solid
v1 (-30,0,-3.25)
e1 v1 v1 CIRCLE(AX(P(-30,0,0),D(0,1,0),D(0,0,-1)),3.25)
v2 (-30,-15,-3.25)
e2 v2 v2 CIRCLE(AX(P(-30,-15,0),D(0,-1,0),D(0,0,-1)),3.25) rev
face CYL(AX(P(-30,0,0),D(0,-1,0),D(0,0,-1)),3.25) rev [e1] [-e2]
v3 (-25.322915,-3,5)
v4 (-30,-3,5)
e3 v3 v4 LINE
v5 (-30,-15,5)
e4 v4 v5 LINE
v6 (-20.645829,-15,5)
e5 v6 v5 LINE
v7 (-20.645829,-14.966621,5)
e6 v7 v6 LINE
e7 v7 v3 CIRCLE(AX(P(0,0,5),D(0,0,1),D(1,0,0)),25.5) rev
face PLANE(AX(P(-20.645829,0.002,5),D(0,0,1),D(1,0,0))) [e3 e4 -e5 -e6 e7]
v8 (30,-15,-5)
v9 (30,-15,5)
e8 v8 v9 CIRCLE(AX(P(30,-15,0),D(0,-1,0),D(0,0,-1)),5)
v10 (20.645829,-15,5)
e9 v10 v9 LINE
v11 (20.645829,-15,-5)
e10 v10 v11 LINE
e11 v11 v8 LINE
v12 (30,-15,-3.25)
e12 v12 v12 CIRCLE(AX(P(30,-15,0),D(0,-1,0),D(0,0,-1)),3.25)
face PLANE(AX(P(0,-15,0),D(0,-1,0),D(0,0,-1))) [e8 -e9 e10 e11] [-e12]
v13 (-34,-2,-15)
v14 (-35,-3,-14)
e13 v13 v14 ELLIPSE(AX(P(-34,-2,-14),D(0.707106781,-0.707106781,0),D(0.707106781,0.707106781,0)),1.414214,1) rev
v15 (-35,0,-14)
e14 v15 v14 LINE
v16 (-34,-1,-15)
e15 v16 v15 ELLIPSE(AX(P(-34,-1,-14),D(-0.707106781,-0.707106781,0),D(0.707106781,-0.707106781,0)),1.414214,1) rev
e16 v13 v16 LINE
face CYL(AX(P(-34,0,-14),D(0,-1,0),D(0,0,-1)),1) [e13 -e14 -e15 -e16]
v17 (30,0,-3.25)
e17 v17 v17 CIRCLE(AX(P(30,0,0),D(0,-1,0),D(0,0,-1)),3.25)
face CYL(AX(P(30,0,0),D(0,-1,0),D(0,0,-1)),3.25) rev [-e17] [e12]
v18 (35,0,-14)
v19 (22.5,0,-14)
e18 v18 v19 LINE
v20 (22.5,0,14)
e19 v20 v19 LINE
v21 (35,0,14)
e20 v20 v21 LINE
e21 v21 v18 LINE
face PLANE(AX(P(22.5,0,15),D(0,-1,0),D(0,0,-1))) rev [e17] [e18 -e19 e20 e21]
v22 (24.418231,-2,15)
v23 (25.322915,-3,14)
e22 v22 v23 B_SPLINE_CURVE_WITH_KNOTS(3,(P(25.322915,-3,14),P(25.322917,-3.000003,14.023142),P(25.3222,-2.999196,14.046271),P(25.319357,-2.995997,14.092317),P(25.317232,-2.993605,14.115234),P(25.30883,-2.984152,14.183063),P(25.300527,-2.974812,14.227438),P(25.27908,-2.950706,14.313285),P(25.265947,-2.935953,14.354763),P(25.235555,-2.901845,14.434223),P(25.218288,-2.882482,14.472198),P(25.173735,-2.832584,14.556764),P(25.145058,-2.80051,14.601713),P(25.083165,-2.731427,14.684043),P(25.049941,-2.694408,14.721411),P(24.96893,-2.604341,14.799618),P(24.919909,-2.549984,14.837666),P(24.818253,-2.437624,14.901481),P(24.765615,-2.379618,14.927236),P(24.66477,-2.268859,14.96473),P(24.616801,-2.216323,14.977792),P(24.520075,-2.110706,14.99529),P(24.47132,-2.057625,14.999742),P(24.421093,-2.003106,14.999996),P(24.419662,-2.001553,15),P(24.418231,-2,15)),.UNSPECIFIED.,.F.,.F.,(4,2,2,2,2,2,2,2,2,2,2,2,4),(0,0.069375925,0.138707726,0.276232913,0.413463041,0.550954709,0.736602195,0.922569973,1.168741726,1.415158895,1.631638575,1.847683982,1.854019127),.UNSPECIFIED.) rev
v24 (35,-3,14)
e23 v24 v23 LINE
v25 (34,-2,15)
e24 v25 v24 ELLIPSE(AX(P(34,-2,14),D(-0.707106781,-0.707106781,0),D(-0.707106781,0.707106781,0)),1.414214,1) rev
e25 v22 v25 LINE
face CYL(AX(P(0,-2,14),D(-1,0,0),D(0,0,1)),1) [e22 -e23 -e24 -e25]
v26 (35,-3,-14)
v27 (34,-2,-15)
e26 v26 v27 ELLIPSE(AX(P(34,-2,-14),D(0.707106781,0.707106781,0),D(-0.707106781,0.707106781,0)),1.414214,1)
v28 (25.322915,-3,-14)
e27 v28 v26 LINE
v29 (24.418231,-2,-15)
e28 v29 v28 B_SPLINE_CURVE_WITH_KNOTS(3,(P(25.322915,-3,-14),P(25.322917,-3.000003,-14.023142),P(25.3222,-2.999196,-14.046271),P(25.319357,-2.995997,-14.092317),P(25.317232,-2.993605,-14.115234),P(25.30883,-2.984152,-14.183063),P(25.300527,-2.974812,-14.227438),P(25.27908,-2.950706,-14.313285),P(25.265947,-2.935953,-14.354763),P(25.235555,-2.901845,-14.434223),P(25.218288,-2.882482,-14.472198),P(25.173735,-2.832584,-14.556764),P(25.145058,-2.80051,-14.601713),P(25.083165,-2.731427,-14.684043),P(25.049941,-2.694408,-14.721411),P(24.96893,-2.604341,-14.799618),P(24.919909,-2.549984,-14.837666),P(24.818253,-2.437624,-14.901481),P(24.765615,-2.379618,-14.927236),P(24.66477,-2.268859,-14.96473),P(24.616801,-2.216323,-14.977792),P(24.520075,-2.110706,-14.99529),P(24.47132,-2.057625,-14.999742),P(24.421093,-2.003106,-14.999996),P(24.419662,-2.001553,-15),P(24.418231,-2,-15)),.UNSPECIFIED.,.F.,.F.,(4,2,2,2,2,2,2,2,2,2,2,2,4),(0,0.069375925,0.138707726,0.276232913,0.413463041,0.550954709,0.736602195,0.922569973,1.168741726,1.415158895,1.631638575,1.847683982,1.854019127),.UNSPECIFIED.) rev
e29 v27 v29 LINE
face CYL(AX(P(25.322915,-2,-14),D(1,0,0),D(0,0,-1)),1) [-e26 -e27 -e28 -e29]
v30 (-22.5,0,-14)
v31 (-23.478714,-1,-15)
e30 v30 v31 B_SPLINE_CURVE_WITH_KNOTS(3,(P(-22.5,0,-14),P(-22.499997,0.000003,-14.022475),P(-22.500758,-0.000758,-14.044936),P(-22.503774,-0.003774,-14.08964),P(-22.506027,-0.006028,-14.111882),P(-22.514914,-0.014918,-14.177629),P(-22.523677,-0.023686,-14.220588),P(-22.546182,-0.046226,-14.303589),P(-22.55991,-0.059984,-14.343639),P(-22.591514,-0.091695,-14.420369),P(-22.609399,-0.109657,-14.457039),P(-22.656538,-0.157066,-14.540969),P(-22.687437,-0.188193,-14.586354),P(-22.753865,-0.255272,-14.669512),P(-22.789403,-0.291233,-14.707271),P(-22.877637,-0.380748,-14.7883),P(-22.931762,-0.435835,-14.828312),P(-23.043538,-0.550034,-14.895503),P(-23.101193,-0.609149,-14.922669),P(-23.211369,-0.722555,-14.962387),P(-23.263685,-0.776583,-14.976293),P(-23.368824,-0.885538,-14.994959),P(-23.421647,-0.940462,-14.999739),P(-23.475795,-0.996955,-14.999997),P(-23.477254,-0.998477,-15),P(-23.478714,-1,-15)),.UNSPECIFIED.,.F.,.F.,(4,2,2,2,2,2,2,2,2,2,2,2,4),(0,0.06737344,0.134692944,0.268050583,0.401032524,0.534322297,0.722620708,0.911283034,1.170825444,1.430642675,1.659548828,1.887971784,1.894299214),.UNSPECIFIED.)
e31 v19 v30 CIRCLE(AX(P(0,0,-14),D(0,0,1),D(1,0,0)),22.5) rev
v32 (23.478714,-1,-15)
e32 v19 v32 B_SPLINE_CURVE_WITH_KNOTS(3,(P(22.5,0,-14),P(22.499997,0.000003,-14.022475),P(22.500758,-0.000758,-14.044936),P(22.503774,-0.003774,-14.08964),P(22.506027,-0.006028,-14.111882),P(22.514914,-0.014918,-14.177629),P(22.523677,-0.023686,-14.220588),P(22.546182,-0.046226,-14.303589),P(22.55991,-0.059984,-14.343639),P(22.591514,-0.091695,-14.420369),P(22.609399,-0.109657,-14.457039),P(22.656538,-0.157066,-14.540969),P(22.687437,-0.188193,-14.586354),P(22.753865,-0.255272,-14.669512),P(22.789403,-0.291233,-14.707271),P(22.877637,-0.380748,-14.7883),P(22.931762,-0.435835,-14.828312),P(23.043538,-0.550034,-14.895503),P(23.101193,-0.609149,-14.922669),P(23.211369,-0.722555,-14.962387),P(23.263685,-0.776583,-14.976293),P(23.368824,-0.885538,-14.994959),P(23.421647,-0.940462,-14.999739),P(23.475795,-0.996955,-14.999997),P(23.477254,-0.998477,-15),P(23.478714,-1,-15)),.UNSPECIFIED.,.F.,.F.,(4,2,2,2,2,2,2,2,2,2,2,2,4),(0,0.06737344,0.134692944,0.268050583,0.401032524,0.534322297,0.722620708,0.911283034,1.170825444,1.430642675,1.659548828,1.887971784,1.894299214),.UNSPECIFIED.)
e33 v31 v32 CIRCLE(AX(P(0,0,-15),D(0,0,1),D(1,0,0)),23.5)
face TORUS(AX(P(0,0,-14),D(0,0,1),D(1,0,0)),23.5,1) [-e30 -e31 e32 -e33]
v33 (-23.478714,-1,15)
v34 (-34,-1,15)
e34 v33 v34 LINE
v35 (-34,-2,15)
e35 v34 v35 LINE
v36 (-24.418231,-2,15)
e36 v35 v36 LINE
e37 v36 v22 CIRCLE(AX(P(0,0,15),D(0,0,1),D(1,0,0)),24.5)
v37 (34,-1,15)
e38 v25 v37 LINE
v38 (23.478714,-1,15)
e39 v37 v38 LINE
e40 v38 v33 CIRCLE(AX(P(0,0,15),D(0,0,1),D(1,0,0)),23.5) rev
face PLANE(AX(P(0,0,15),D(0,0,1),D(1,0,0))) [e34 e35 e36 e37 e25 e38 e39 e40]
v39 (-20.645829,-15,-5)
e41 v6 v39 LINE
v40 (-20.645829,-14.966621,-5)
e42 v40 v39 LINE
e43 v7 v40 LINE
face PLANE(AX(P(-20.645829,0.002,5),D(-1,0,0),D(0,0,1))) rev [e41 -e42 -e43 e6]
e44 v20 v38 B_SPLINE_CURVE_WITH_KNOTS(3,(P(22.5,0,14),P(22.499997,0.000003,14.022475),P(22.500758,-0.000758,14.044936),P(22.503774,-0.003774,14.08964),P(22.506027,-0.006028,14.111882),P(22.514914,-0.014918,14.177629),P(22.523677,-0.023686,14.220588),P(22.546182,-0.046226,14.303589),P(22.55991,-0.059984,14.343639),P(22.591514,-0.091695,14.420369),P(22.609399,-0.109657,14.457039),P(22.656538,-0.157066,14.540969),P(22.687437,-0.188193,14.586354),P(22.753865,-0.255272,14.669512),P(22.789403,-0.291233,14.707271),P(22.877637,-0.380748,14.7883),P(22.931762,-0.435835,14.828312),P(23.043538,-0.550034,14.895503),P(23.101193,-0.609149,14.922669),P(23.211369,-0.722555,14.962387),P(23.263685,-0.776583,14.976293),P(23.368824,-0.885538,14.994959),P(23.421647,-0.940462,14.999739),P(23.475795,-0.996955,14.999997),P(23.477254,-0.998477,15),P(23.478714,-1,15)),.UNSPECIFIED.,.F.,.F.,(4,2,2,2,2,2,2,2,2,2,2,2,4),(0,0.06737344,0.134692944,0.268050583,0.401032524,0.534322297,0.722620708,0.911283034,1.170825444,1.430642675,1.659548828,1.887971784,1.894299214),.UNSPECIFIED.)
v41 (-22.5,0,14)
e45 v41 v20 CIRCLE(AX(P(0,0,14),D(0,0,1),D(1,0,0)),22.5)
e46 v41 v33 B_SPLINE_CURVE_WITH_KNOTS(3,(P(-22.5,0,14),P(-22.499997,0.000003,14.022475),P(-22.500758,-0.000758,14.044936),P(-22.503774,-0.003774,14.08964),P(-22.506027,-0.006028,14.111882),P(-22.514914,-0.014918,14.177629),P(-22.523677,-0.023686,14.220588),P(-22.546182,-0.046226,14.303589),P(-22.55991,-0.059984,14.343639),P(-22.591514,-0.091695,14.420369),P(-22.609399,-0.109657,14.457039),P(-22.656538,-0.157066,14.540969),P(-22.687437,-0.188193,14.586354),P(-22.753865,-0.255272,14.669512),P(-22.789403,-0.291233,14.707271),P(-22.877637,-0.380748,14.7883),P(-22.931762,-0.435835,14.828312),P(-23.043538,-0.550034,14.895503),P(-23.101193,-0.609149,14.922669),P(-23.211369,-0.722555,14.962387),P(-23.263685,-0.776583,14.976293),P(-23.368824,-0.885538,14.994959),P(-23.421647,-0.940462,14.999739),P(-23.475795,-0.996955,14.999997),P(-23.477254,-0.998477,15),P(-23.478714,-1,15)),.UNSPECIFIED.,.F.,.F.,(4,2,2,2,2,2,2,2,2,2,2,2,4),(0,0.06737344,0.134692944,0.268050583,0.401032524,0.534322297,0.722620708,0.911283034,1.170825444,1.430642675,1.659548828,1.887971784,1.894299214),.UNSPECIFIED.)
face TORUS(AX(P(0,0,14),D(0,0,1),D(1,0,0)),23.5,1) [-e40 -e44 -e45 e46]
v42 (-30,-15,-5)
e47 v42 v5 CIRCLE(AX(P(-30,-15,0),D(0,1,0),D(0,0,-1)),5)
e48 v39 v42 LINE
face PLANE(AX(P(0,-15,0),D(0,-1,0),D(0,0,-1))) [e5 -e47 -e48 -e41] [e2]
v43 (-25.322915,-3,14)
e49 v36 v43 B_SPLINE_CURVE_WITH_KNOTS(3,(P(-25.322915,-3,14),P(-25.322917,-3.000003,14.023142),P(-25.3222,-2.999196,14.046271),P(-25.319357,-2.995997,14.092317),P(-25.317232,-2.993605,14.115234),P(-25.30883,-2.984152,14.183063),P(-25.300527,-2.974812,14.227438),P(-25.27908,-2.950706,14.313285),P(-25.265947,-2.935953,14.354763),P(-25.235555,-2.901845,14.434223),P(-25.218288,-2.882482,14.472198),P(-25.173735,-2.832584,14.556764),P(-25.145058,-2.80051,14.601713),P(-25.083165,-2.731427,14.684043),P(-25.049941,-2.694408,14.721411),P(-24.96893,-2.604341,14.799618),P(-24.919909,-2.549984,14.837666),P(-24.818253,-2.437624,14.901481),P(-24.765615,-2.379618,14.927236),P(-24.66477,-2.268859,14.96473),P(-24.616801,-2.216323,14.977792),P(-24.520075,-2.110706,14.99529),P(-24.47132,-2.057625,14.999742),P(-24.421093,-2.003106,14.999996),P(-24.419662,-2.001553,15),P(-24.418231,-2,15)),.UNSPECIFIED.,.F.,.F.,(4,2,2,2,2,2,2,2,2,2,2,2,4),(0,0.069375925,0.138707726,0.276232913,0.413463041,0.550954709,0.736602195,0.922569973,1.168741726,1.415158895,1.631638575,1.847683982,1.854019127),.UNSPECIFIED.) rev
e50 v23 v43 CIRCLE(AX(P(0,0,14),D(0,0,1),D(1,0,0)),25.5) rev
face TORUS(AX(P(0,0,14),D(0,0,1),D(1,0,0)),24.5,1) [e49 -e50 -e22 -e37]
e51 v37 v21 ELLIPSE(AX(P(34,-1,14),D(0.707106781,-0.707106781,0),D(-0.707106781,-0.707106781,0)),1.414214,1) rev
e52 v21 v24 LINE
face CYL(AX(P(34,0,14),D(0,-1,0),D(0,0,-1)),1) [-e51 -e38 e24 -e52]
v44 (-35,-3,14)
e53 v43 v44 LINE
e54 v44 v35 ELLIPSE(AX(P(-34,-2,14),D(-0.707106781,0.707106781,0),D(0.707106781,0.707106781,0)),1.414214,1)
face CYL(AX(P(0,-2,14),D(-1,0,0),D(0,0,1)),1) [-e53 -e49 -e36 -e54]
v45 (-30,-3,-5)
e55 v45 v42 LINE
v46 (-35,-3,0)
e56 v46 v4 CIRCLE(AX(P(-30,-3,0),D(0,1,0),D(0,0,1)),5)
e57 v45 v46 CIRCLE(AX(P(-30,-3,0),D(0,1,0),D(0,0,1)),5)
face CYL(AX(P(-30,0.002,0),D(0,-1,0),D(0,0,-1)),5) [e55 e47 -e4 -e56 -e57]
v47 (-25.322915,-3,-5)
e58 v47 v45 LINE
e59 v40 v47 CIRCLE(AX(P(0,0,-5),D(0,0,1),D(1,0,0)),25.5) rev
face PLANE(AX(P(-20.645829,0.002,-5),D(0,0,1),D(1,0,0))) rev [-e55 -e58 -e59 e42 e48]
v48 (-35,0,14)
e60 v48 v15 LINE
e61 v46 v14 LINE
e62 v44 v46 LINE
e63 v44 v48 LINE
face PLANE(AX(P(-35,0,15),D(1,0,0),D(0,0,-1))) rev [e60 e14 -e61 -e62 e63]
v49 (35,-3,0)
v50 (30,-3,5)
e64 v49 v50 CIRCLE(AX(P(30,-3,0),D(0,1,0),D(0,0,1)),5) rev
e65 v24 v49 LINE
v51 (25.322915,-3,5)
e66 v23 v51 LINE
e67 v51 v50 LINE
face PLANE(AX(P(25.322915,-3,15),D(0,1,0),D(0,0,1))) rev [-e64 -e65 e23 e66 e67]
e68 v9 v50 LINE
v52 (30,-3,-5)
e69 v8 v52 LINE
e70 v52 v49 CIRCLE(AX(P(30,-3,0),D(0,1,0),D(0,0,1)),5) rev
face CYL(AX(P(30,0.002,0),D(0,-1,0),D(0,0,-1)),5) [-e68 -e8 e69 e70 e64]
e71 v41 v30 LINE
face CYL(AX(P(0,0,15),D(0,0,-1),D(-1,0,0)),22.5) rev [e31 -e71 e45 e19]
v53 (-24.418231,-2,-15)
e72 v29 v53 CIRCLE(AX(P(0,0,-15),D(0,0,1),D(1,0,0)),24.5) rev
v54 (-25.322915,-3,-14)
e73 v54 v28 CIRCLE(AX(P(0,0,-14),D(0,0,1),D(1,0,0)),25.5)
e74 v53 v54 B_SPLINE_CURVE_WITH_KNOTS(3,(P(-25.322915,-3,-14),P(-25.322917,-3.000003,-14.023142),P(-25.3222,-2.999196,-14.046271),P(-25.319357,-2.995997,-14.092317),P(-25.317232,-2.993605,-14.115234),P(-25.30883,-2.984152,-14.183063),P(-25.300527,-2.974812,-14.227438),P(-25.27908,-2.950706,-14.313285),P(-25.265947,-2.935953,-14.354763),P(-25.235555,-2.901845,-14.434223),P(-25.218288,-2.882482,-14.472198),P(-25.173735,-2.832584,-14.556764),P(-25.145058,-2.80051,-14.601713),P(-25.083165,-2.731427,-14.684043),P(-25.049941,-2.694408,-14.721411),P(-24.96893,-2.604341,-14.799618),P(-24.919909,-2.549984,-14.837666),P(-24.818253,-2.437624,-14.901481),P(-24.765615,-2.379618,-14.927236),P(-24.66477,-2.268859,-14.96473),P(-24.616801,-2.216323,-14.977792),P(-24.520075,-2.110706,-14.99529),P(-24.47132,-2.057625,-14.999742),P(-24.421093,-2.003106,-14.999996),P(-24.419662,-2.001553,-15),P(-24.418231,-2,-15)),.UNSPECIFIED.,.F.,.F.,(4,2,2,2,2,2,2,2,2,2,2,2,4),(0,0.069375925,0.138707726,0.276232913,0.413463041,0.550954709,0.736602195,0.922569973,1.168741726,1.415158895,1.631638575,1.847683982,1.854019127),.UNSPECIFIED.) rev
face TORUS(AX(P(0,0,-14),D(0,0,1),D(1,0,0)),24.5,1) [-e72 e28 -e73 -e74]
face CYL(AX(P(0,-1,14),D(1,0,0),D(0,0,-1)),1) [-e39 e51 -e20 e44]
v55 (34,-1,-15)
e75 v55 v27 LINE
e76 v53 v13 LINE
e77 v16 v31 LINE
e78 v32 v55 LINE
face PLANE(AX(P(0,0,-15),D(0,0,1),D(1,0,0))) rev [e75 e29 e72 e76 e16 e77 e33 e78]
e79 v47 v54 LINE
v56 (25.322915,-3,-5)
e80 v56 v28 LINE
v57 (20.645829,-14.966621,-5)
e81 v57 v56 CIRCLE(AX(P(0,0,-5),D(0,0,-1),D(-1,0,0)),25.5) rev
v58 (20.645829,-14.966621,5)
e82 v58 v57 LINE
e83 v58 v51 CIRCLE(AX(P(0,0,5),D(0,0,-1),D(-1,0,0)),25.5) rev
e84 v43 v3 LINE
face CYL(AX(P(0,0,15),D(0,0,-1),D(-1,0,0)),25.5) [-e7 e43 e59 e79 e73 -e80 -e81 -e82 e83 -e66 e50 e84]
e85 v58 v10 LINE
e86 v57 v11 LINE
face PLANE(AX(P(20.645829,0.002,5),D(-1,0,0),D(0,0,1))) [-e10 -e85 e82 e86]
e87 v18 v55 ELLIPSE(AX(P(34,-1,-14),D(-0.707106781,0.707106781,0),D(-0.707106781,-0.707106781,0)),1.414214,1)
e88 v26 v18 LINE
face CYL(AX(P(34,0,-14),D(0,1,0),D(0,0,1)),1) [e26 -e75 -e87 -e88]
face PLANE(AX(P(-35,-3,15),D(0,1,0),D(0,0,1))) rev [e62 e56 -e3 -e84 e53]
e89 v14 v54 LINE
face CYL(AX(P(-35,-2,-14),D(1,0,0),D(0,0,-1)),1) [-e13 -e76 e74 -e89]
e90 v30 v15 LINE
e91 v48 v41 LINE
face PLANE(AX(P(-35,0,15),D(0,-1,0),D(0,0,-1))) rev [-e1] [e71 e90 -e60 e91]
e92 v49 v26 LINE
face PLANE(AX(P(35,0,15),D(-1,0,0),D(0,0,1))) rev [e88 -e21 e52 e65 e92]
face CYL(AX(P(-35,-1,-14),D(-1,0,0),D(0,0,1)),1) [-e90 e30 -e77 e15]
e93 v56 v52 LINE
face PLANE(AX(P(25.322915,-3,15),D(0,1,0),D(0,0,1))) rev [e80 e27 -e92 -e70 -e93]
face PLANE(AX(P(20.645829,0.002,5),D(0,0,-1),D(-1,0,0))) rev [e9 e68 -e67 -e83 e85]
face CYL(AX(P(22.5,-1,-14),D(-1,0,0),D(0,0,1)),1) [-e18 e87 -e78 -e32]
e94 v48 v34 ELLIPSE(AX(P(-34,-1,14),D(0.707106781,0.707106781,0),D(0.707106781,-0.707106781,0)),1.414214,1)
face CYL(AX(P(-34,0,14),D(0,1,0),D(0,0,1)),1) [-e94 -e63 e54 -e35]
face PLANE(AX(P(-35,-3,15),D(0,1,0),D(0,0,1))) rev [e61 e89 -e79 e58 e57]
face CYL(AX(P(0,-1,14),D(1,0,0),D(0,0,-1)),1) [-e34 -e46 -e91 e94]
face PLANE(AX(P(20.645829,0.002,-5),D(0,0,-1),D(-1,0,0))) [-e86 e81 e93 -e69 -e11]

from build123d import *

# Parameters (mm, degrees)
BOSS_EXTRUDE1_DEPTH = 15
BOSS_EXTRUDE5_REACH = 58.23
BOSS_EXTRUDE5_START = 12
SKETCH4_5_R         = 3.25
CUT_EXTRUDE1_DEPTH  = 45.229515032
FILLET1_R           = 1


with BuildPart() as part:
    # Sketch1 → Boss-Extrude1 (new, symmetric)
    with BuildSketch(Plane.XY):
        with BuildLine():
            Line((-35, 0), (-22.5, 0))
            ThreePointArc((-22.5, 0), (0, -22.5), (22.5, 0))
            Line((22.5, 0), (35, 0))
            Line((35, 0), (35, -3))
            Line((35, -3), (25.322914524, -3))
            ThreePointArc((25.322914524, -3), (0, -25.5), (-25.322914524, -3))
            Line((-25.322914524, -3), (-35, -3))
            Line((-35, -3), (-35, 0))
        make_face()
    extrude(amount=BOSS_EXTRUDE1_DEPTH, both=True)

    # Sketch4 → Boss-Extrude5 (add, up to next)
    with BuildSketch(Plane.XZ.offset(3).offset(BOSS_EXTRUDE5_START), mode=Mode.PRIVATE) as boss_extrude5_sk1:
        with BuildLine():
            Line((20.645829048, 5), (20.645829048, -5))
            Line((20.645829048, -5), (30, -5))
            ThreePointArc((30, -5), (35, 0), (30, 5))
            Line((30, 5), (20.645829048, 5))
        make_face()
    boss_extrude5_tool1 = extrude(boss_extrude5_sk1.sketch, amount=-BOSS_EXTRUDE5_REACH, mode=Mode.PRIVATE) - part.part
    boss_extrude5 = boss_extrude5_tool1.solids().sort_by_distance((27.333296, -15, 0))[0]
    add(boss_extrude5)

    # Sketch4<5> → Cut-Extrude1 (cut, symmetric)
    with BuildSketch(Plane.XZ.offset(3)):
        with Locations((30, 0)):
            Circle(SKETCH4_5_R)
    cut_extrude1 = extrude(amount=CUT_EXTRUDE1_DEPTH, both=True, mode=Mode.SUBTRACT)

    # Mirror1: Boss-Extrude5, Cut-Extrude1 across plane
    add(boss_extrude5.mirror(Plane(origin=(0, 0, 0), x_dir=(0, 0, 1), z_dir=(1, 0, 0))))
    add(cut_extrude1.mirror(Plane(origin=(0, 0, 0), x_dir=(0, 0, 1), z_dir=(1, 0, 0))), mode=Mode.SUBTRACT)

    # Fillet1
    fillet1_edges = [part.edges().sort_by_distance(p)[0] for p in [
        (28.75, 0, 15),
        (35, -1.5, 15),
        (30.161457262, -3, 15),
        (0, -25.5, 15),
        (-30.161457262, -3, 15),
        (-35, -1.5, 15),
        (-28.75, 0, 15),
        (0, -22.5, 15),
        (-28.75, 0, -15),
        (-35, -1.5, -15),
        (-30.161457262, -3, -15),
        (0, -25.5, -15),
        (30.161457262, -3, -15),
        (35, -1.5, -15),
        (28.75, 0, -15),
        (0, -22.5, -15),
    ]]
    fillet(fillet1_edges, radius=FILLET1_R)


solid = part.part
